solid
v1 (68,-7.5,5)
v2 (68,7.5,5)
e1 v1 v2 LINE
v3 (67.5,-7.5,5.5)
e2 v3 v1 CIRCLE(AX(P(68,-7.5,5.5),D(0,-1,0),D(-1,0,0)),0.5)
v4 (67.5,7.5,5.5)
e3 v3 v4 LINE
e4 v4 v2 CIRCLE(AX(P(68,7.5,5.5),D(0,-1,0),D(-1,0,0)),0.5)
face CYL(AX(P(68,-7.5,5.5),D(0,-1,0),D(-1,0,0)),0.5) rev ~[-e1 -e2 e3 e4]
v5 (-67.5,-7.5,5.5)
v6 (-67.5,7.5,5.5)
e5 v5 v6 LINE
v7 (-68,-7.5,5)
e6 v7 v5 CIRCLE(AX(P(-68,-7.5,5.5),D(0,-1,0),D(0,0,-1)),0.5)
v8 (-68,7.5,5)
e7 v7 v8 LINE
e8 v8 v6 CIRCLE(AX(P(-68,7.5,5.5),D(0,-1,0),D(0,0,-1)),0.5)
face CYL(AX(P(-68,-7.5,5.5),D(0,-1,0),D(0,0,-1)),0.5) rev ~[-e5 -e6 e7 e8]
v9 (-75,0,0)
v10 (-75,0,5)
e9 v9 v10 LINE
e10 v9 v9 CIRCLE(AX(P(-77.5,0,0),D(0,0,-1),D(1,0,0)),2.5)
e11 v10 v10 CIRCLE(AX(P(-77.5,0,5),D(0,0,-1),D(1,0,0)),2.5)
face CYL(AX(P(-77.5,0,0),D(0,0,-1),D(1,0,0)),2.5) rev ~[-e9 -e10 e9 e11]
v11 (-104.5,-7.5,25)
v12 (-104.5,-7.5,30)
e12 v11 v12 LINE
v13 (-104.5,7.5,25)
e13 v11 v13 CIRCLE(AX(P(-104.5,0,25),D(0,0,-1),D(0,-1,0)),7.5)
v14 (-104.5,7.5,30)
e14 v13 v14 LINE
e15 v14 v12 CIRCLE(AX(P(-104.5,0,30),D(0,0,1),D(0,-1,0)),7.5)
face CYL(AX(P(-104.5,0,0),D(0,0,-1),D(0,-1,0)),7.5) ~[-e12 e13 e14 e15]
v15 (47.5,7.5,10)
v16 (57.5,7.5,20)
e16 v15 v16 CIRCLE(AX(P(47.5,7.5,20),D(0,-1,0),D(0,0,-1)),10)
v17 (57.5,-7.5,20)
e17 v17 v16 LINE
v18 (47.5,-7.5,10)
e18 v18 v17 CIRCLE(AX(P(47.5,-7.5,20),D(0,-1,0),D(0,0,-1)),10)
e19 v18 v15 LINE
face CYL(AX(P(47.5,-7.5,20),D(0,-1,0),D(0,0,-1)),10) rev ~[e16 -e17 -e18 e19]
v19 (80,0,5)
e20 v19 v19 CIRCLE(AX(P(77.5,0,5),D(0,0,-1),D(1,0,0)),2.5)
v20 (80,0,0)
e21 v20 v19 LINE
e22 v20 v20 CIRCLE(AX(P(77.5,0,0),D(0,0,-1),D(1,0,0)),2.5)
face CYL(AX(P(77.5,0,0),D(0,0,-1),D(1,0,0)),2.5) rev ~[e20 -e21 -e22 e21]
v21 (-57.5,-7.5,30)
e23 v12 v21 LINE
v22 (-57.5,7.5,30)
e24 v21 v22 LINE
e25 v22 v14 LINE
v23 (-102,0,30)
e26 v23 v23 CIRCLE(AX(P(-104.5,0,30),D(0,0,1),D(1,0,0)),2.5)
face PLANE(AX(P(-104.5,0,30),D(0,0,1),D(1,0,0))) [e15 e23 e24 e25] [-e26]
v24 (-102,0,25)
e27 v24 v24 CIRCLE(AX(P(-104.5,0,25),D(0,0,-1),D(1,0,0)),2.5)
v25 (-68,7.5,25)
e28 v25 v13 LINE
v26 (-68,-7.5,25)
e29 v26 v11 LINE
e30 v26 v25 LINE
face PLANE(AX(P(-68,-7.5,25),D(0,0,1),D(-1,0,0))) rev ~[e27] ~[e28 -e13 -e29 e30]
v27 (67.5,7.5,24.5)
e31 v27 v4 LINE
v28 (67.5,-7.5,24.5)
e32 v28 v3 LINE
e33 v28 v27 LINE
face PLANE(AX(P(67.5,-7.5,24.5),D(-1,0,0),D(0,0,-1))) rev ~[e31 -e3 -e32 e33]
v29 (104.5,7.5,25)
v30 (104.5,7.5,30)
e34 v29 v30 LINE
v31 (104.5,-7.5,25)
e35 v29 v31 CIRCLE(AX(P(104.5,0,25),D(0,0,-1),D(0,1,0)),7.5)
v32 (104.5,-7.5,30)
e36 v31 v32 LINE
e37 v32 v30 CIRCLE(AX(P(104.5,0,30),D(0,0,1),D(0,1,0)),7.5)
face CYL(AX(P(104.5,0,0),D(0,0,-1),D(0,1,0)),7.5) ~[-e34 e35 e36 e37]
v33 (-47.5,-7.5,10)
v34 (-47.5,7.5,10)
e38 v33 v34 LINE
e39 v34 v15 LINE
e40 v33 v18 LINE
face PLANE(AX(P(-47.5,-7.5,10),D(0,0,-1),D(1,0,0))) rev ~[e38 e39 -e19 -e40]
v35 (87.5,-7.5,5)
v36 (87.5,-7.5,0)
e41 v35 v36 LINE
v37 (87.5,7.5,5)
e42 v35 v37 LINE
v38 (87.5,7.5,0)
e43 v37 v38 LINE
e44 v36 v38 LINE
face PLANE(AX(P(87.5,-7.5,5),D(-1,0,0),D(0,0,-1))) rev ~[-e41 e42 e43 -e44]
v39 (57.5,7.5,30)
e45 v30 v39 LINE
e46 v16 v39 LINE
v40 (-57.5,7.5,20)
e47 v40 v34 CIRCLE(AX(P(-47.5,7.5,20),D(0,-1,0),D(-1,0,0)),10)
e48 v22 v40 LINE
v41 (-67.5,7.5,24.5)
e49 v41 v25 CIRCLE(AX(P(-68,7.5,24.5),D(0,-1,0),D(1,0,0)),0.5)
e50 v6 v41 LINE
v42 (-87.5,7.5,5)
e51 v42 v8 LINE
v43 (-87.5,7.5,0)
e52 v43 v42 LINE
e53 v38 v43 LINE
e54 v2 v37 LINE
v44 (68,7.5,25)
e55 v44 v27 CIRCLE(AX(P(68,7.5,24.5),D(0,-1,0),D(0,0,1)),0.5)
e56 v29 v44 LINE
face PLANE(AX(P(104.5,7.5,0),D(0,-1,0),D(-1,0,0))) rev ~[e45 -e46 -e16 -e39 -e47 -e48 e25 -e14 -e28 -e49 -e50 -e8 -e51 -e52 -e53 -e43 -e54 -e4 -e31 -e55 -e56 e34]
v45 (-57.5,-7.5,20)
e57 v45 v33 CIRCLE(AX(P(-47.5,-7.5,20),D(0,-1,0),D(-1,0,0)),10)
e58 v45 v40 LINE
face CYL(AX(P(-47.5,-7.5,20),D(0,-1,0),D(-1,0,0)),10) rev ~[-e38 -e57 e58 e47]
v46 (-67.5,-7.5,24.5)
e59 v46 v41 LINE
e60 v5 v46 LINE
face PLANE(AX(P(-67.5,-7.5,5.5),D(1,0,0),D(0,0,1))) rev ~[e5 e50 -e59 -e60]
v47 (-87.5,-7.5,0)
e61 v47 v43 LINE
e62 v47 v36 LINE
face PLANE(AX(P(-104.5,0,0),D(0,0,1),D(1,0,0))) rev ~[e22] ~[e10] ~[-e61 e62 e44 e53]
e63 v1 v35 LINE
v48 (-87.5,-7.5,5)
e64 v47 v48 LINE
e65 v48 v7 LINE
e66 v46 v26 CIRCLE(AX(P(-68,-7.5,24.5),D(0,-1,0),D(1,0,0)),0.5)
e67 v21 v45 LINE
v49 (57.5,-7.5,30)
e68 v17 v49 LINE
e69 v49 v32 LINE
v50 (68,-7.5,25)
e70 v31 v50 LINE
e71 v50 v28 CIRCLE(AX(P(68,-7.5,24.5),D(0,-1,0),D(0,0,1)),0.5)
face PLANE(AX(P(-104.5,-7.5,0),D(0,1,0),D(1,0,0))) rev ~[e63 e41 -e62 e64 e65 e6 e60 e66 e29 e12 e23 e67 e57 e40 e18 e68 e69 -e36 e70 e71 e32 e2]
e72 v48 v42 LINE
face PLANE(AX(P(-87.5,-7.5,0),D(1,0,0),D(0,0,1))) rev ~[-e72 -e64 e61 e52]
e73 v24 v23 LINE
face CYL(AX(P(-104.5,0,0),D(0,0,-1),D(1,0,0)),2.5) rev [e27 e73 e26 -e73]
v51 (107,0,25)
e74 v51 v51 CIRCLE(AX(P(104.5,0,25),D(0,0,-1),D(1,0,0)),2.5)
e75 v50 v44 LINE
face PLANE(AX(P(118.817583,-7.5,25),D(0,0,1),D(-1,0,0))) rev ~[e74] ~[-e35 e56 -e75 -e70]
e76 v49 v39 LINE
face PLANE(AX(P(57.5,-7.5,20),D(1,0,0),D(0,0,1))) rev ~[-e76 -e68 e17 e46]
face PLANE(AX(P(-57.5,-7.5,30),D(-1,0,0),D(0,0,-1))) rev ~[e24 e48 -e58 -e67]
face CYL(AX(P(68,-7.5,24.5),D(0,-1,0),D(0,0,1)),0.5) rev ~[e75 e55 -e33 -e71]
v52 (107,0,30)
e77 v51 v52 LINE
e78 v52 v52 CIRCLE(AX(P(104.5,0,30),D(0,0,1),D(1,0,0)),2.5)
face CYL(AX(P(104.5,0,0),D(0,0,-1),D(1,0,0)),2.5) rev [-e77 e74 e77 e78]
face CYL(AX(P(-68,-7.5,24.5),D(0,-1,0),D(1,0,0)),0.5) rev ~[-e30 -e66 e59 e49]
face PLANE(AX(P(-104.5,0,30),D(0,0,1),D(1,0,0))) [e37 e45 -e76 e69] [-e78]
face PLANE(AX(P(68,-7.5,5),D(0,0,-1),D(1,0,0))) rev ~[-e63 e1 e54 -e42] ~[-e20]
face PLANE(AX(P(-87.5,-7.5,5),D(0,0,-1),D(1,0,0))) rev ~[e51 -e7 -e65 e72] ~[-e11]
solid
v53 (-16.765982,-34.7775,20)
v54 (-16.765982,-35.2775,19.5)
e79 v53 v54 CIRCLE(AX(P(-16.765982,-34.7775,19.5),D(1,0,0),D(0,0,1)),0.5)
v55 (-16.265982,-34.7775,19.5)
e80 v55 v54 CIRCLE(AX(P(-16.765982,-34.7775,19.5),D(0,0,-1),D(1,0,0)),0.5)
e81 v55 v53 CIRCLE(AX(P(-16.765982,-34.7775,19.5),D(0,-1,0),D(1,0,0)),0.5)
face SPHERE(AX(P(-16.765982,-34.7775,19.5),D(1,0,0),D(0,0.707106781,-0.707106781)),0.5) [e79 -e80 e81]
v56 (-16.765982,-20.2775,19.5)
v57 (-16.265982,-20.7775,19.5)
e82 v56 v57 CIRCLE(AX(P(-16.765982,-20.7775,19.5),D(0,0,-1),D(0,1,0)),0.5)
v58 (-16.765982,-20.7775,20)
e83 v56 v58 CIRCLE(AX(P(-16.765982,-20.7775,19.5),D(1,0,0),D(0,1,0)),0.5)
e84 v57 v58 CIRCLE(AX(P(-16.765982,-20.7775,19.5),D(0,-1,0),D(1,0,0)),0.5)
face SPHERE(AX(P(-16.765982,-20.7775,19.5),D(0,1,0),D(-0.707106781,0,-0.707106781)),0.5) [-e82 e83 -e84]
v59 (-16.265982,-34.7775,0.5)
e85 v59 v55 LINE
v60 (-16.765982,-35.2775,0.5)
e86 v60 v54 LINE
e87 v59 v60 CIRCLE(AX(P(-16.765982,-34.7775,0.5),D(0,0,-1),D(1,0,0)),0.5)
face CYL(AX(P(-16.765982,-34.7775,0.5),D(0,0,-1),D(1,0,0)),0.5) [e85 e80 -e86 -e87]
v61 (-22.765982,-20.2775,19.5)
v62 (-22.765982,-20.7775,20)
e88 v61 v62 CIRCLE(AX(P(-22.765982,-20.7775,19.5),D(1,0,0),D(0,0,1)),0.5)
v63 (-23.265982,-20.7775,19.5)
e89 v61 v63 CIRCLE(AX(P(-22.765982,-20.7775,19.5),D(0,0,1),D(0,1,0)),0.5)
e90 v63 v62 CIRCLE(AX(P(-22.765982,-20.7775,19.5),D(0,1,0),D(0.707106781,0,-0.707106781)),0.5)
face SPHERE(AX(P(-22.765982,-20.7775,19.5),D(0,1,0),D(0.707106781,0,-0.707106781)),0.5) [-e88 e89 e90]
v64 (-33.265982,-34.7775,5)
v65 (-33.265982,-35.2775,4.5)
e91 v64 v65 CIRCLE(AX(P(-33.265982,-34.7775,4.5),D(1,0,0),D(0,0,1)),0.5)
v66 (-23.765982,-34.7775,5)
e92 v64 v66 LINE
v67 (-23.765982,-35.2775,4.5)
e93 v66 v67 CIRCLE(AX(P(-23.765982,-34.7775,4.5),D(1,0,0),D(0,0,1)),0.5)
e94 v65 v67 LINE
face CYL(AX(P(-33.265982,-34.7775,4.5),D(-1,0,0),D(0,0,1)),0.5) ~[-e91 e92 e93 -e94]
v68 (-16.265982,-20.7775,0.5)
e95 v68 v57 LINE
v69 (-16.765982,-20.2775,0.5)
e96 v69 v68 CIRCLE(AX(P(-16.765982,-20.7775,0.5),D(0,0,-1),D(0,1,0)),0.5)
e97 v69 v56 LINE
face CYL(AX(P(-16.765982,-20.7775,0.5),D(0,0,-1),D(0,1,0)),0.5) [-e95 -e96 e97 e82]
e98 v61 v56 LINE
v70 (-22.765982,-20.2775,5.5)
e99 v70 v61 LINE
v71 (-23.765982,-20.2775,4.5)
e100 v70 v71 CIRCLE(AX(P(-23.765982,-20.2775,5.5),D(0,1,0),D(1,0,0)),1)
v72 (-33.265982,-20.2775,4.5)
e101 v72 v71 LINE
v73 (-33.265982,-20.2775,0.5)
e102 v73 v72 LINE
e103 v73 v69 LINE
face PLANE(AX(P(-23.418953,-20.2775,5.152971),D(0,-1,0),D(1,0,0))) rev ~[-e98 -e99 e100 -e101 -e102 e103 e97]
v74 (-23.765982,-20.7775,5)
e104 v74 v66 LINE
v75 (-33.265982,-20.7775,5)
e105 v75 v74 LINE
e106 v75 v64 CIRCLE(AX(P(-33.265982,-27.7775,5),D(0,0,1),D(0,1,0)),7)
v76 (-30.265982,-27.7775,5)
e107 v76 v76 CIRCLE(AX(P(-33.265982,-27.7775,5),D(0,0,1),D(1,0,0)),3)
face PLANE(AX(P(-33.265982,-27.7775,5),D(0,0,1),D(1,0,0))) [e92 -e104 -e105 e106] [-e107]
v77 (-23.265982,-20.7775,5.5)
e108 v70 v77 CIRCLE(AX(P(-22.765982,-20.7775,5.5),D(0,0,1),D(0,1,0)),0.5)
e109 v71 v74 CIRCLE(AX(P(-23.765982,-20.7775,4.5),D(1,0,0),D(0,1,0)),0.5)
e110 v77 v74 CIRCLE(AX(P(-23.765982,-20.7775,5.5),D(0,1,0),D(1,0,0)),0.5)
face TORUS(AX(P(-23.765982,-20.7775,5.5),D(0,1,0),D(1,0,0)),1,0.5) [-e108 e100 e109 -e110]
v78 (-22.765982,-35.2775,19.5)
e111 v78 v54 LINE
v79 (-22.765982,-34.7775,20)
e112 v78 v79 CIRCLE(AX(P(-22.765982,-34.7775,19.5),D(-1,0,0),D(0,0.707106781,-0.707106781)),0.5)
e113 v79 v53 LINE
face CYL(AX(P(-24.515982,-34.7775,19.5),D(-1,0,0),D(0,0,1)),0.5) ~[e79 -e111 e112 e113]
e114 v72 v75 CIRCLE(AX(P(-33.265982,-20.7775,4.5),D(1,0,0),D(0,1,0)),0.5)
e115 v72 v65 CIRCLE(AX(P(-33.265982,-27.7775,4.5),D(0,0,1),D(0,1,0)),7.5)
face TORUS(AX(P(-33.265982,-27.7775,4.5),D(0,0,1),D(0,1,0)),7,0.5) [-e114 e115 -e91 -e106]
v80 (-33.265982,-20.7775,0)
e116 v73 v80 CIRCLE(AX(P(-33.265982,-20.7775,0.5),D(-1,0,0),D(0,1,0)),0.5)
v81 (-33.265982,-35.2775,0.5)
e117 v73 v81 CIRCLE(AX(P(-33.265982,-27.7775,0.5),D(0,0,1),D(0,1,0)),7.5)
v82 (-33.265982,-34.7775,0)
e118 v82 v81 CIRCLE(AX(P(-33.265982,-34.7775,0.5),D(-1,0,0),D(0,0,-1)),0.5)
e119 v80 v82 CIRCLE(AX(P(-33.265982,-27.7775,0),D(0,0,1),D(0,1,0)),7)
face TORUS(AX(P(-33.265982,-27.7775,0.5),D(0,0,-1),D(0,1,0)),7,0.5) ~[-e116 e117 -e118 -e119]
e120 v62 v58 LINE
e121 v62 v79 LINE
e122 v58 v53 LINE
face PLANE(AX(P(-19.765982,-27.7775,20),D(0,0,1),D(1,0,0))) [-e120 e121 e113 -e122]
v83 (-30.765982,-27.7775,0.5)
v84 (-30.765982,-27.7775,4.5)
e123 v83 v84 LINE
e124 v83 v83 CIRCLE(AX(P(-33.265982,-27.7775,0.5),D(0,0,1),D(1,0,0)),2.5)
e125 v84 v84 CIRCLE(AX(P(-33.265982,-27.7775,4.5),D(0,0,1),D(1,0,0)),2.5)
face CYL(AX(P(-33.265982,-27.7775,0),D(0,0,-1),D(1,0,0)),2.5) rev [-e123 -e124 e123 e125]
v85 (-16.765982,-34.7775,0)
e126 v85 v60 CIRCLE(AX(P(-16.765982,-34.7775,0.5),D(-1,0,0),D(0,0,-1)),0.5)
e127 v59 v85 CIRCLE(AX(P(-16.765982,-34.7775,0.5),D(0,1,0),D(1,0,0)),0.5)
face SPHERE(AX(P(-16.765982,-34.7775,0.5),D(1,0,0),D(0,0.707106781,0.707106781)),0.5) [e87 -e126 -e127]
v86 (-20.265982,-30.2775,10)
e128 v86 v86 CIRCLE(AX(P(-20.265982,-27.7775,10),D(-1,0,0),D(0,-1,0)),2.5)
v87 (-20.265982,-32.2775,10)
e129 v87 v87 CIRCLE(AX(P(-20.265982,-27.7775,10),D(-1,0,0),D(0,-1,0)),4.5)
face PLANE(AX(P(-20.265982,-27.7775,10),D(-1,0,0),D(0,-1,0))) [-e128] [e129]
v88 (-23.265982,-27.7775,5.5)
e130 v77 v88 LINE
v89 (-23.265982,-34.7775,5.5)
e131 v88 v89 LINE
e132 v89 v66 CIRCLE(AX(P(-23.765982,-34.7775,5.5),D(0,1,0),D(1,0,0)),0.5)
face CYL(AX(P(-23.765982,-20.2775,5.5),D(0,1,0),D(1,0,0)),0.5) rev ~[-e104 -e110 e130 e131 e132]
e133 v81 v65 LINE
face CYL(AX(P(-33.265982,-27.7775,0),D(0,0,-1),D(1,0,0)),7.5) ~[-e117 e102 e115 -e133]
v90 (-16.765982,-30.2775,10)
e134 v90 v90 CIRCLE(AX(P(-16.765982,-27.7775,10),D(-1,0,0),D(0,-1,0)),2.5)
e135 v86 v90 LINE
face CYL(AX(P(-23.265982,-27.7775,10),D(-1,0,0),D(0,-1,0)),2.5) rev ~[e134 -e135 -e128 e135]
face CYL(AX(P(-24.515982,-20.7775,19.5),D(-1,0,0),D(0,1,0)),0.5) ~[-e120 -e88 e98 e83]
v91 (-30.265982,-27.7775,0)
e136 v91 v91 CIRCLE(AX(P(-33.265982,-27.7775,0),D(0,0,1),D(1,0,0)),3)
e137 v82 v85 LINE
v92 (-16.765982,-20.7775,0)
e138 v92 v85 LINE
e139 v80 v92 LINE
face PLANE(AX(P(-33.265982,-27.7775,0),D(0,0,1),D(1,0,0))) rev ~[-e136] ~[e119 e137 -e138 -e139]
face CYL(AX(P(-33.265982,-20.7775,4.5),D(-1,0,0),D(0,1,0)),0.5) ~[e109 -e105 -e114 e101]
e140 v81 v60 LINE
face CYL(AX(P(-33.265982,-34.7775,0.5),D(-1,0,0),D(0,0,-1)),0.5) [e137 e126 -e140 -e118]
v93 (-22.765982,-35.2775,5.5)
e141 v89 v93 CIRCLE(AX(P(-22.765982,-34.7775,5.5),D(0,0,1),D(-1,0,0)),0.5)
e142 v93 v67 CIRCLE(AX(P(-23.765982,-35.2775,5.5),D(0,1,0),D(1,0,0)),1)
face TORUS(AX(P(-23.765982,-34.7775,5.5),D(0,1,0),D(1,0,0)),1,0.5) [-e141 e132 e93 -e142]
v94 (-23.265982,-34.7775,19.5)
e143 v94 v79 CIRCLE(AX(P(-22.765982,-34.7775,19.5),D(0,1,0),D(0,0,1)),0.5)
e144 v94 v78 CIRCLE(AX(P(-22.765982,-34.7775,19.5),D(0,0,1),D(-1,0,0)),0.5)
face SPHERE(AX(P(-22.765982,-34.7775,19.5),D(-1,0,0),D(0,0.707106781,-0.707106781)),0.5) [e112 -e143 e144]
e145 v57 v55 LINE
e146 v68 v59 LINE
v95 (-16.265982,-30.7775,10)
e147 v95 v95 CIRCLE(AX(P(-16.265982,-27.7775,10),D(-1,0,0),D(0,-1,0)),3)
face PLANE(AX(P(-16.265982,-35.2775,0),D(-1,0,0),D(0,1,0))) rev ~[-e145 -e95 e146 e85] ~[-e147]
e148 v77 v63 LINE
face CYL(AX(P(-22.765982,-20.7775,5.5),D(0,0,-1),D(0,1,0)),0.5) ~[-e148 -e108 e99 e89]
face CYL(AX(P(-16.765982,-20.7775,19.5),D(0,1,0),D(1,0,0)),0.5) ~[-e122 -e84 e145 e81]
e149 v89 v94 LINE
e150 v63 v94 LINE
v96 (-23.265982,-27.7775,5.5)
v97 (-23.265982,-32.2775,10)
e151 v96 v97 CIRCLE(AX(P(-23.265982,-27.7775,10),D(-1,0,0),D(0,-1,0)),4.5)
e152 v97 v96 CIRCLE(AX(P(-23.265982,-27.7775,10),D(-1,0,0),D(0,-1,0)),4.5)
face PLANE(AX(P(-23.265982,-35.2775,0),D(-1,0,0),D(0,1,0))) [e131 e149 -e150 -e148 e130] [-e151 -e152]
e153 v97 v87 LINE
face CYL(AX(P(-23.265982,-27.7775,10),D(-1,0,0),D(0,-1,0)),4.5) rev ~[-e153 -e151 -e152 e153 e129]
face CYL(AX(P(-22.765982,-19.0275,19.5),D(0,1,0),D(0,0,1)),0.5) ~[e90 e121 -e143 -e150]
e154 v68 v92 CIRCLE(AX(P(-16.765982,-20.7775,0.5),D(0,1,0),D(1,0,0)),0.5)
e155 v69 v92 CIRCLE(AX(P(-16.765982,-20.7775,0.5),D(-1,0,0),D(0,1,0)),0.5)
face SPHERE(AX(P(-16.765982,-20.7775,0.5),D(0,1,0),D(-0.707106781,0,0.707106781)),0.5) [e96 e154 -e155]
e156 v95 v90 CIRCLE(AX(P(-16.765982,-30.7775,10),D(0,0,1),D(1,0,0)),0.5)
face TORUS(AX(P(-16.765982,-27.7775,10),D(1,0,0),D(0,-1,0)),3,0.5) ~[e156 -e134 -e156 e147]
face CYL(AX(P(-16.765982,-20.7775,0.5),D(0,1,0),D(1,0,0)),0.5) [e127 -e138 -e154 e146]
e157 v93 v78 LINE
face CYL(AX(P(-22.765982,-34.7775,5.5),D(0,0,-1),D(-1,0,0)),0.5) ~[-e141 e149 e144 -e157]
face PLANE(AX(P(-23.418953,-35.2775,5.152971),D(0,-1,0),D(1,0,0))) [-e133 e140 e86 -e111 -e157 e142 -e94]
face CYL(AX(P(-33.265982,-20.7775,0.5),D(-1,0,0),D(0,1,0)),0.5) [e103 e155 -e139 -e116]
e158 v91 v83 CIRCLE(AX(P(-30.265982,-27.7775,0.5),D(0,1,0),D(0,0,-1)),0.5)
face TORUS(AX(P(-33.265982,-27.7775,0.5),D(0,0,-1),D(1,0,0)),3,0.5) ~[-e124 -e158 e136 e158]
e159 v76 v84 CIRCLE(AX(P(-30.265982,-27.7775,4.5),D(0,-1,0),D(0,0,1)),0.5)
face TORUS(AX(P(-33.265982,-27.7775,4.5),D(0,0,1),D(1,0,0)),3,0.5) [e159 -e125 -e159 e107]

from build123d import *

# Parameters (mm, degrees)
F0_R          = 2.5
F1_DEPTH      = 30
F3_DEPTH      = 25
F4_R          = 2.5
F5_DEPTH      = 25
F6_W          = 7
F6_H          = 15
F7_DEPTH      = 20
F6_R          = 2.5
F8_DEPTH      = 5
F9_R          = 4.5
F9_R_2        = 2.5
F10_DEPTH     = 3
F11_DEPTH     = 7
F12_T1_DEPTH  = 15
F12_T3_DEPTH  = 7.75
F12_T5_DEPTH  = 17.5
F12_T7_DEPTH  = 14
F12_T9_DEPTH  = 19
F12_T11_DEPTH = 16.5
F12_S15_W     = 0.5
F12_S15_H     = 0.5
F12_T16_DEPTH = 0.5
F12_S21_W     = 0.5
F12_S21_H     = 0.5
F12_T22_DEPTH = 0.5
F12_S27_W     = 0.5
F12_S27_H     = 0.5
F12_T28_DEPTH = 0.5
F12_S33_W     = 0.5
F12_S33_H     = 0.5
F12_T34_DEPTH = 0.5
F12_T40_ANGLE = 180
F12_T45_DEPTH = 14
F12_T47_DEPTH = 9.5
F12_S51_W     = 0.5
F12_S51_H     = 0.5
F12_T52_DEPTH = 0.5
F12_S57_W     = 0.5
F12_S57_H     = 0.5
F12_T58_DEPTH = 0.5
F12_T62_ANGLE = 180
F12_T64_ANGLE = 90
F12_T66_ANGLE = 90


# Not quite as in the source:
# - a fillet or chamfer that OpenCascade refuses, or shapes differently, is made with other operations: its cross-section is extruded or revolved along the edge and cut away or added


with BuildPart() as f1:
    # F0 (on Top) → F1 (new body)
    with BuildSketch(Plane.XY):
        with BuildLine():
            ThreePointArc((-97, 0), (-99.1966991411, 5.3033008589), (-104.5, 7.5))
            ThreePointArc((-104.5, 7.5), (-112, 0), (-104.5, -7.5))
            ThreePointArc((-104.5, -7.5), (-99.1966991411, -5.3033008589), (-97, 0))
        make_face()
        with Locations((-104.5, 0)):
            Circle(F0_R, mode=Mode.SUBTRACT)
        with BuildLine():
            ThreePointArc((104.5, -7.5), (97, 0), (104.5, 7.5))
            Line((104.5, 7.5), (-104.5, 7.5))
            ThreePointArc((-104.5, 7.5), (-99.1966991411, 5.3033008589), (-97, 0))
            ThreePointArc((-97, 0), (-99.1966991411, -5.3033008589), (-104.5, -7.5))
            Line((-104.5, -7.5), (104.5, -7.5))
        make_face()
        with BuildLine():
            ThreePointArc((104.5, -7.5), (109.8033008589, -5.3033008589), (112, 0))
            ThreePointArc((112, 0), (109.8033008589, 5.3033008589), (104.5, 7.5))
            ThreePointArc((104.5, 7.5), (97, 0), (104.5, -7.5))
        make_face()
        with Locations((104.5, 0)):
            Circle(F0_R, mode=Mode.SUBTRACT)
    extrude(amount=F1_DEPTH)

    # F2 (on face) → F3 (cut)
    with BuildSketch(Plane.XZ.offset(7.5)):
        with BuildLine():
            Line((57.5, 30), (0, 30))
            Line((0, 30), (0, 10))
            Line((0, 10), (47.5, 10))
            ThreePointArc((47.5, 10), (54.5710678119, 12.9289321881), (57.5, 20))
            Line((57.5, 20), (57.5, 30))
        make_face()
        with BuildLine():
            Line((0, 10), (0, 30))
            Line((0, 30), (-57.5, 30))
            Line((-57.5, 30), (-57.5, 20))
            ThreePointArc((-57.5, 20), (-54.5710678119, 12.9289321881), (-47.5, 10))
            Line((-47.5, 10), (0, 10))
        make_face()
        with BuildLine():
            Line((104.5, 0), (104.5, 25))
            Line((104.5, 25), (68, 25))
            ThreePointArc((68, 25), (67.6464466094, 24.8535533906), (67.5, 24.5))
            Line((67.5, 24.5), (67.5, 5.5))
            ThreePointArc((67.5, 5.5), (67.6464466094, 5.1464466094), (68, 5))
            Line((68, 5), (87.5, 5))
            Line((87.5, 5), (87.5, 0))
            Line((87.5, 0), (104.5, 0))
        make_face()
        Polygon((118.8175827265, 25), (104.5, 25), (104.5, 0), (118.8175827265, 0), (118.8175827265, 5), align=None)
        with BuildLine():
            Line((-68, 25), (-104.5, 25))
            Line((-104.5, 25), (-104.5, 0))
            Line((-104.5, 0), (-87.5, 0))
            Line((-87.5, 0), (-87.5, 5))
            Line((-87.5, 5), (-68, 5))
            ThreePointArc((-68, 5), (-67.6464466094, 5.1464466094), (-67.5, 5.5))
            Line((-67.5, 5.5), (-67.5, 24.5))
            ThreePointArc((-67.5, 24.5), (-67.6464466094, 24.8535533906), (-68, 25))
        make_face()
        Polygon((-104.5, 0), (-104.5, 25), (-118.8175827265, 25), (-118.8175827265, 5), (-118.8175827265, 0), align=None)
    extrude(amount=-F3_DEPTH, mode=Mode.SUBTRACT)

    # F4 (on face) → F5 (cut)
    with BuildSketch(Plane(origin=(0, 0, 0), x_dir=(1, 0, 0), z_dir=(0, 0, -1))):
        with Locations((-77.5, 0)):
            Circle(F4_R)
        with Locations((77.5, 0)):
            Circle(F4_R)
    extrude(amount=-F5_DEPTH, mode=Mode.SUBTRACT)


with BuildPart() as f7:
    # F6 (on Top) → F7 (new body)
    with BuildSketch(Plane.XY):
        with Locations((-19.7659818232, -27.7775004506)):
            Rectangle(F6_W, F6_H)
    extrude(amount=F7_DEPTH)

    # F6 (on Top) → F8 (join)
    with BuildSketch(Plane.XY):
        with BuildLine():
            ThreePointArc((-33.2659818232, -35.2775004506), (-27.9626809643, -33.0808013095), (-25.7659818232, -27.7775004506))
            ThreePointArc((-25.7659818232, -27.7775004506), (-27.9626809643, -22.4741995917), (-33.2659818232, -20.2775004506))
            ThreePointArc((-33.2659818232, -20.2775004506), (-40.7659818232, -27.7775004506), (-33.2659818232, -35.2775004506))
        make_face()
        with Locations((-33.2659818232, -27.7775004506)):
            Circle(F6_R, mode=Mode.SUBTRACT)
        with BuildLine():
            Line((-25.7659818232, -35.2775004506), (-25.7659818232, -27.7775004506))
            ThreePointArc((-25.7659818232, -27.7775004506), (-27.9626809643, -33.0808013095), (-33.2659818232, -35.2775004506))
            Line((-33.2659818232, -35.2775004506), (-25.7659818232, -35.2775004506))
        make_face()
        with BuildLine():
            ThreePointArc((-33.2659818232, -20.2775004506), (-27.9626809643, -22.4741995917), (-25.7659818232, -27.7775004506))
            Line((-25.7659818232, -27.7775004506), (-25.7659818232, -20.2775004506))
            Line((-25.7659818232, -20.2775004506), (-33.2659818232, -20.2775004506))
        make_face()
        Polygon((-25.7659818232, -20.2775004506), (-25.7659818232, -27.7775004506), (-25.7659818232, -35.2775004506), (-23.2659818232, -35.2775004506), (-23.2659818232, -20.2775004506), align=None)
    extrude(amount=F8_DEPTH)

    # F9 (on face) → F10 (cut)
    with BuildSketch(Plane(origin=(-23.2659818232, 0, 0), x_dir=(0, -1, 0), z_dir=(-1, 0, 0))):
        with Locations((27.7775004506, 10)):
            Circle(F9_R)
        with Locations((27.7775004506, 10)):
            Circle(F9_R_2, mode=Mode.SUBTRACT)
    extrude(amount=-F10_DEPTH, mode=Mode.SUBTRACT)

    # F11 (cut, through all): a face of the model
    f11_faces = [f7.faces().sort_by_distance(p)[0] for p in [
        (-23.2659818232, -27.7775004506, 10),
    ]]
    extrude(f11_faces, amount=-F11_DEPTH, mode=Mode.SUBTRACT)

    # F12: fillet of radius 0.5 on 20 edges, made by hand

    # F12_s2 → F12_t1 (join)
    with BuildSketch(Plane.XZ.offset(20.2775004506)):
        with BuildLine():
            ThreePointArc((-23.2659818232, 5.5), (-23.4124284326, 5.1464466094), (-23.7659818232, 5))
            Line((-23.7659818232, 5), (-23.2659818232, 5))
            Line((-23.2659818232, 5), (-23.2659818232, 5.5))
        make_face()
    extrude(amount=F12_T1_DEPTH)

    # F12_s4 → F12_t3 (cut)
    with BuildSketch(Plane.YZ.offset(-24.5159818232)):
        with BuildLine():
            ThreePointArc((-20.2775004506, 19.5), (-20.42394706, 19.8535533906), (-20.7775004506, 20))
            Line((-20.7775004506, 20), (-20.2775004506, 20))
            Line((-20.2775004506, 20), (-20.2775004506, 19.5))
        make_face()
        with BuildLine():
            ThreePointArc((-34.7775004506, 20), (-35.1310538412, 19.8535533906), (-35.2775004506, 19.5))
            Line((-35.2775004506, 19.5), (-35.2775004506, 20))
            Line((-35.2775004506, 20), (-34.7775004506, 20))
        make_face()
    extrude(amount=F12_T3_DEPTH, mode=Mode.SUBTRACT)

    # F12_s6 → F12_t5 (cut)
    with BuildSketch(Plane.XZ.offset(19.0275004506)):
        with BuildLine():
            ThreePointArc((-22.7659818232, 20), (-23.1195352138, 19.8535533906), (-23.2659818232, 19.5))
            Line((-23.2659818232, 19.5), (-23.2659818232, 20))
            Line((-23.2659818232, 20), (-22.7659818232, 20))
        make_face()
    extrude(amount=F12_T5_DEPTH, mode=Mode.SUBTRACT)

    # F12_s8 → F12_t7 (cut)
    with BuildSketch(Plane.XZ.offset(20.7775004506)):
        with BuildLine():
            ThreePointArc((-16.2659818232, 19.5), (-16.4124284326, 19.8535533906), (-16.7659818232, 20))
            Line((-16.7659818232, 20), (-16.2659818232, 20))
            Line((-16.2659818232, 20), (-16.2659818232, 19.5))
        make_face()
        with BuildLine():
            ThreePointArc((-16.2659818232, 0.5), (-16.4124284326, 0.1464466094), (-16.7659818232, 0))
            Line((-16.7659818232, 0), (-16.2659818232, 0))
            Line((-16.2659818232, 0), (-16.2659818232, 0.5))
        make_face()
    extrude(amount=F12_T7_DEPTH, mode=Mode.SUBTRACT)

    # F12_s10 → F12_t9 (cut)
    with BuildSketch(Plane.XY.offset(0.5)):
        with BuildLine():
            ThreePointArc((-16.2659818232, -34.7775004506), (-16.4124284326, -35.1310538412), (-16.7659818232, -35.2775004506))
            Line((-16.7659818232, -35.2775004506), (-16.2659818232, -35.2775004506))
            Line((-16.2659818232, -35.2775004506), (-16.2659818232, -34.7775004506))
        make_face()
        with BuildLine():
            ThreePointArc((-16.7659818232, -20.2775004506), (-16.4124284326, -20.42394706), (-16.2659818232, -20.7775004506))
            Line((-16.2659818232, -20.7775004506), (-16.2659818232, -20.2775004506))
            Line((-16.2659818232, -20.2775004506), (-16.7659818232, -20.2775004506))
        make_face()
    extrude(amount=F12_T9_DEPTH, mode=Mode.SUBTRACT)

    # F12_s12 → F12_t11 (cut)
    with BuildSketch(Plane.YZ.offset(-33.2659818232)):
        with BuildLine():
            ThreePointArc((-34.7775004506, 0), (-35.1310538412, 0.1464466094), (-35.2775004506, 0.5))
            Line((-35.2775004506, 0.5), (-35.2775004506, 0))
            Line((-35.2775004506, 0), (-34.7775004506, 0))
        make_face()
        with BuildLine():
            ThreePointArc((-20.2775004506, 0.5), (-20.42394706, 0.1464466094), (-20.7775004506, 0))
            Line((-20.7775004506, 0), (-20.2775004506, 0))
            Line((-20.2775004506, 0), (-20.2775004506, 0.5))
        make_face()
    extrude(amount=F12_T11_DEPTH, mode=Mode.SUBTRACT)


with BuildPart() as f12_tool14:
    # F12_s15 → F12_t16 (new body)
    with BuildSketch(Plane.XZ.offset(20.7775004506)):
        with Locations((-16.5159818232, 19.75)):
            Rectangle(F12_S15_W, F12_S15_H)
    extrude(amount=-F12_T16_DEPTH)

    # F12_s17 → F12_t18 (revolve, cut)
    with BuildSketch(Plane(origin=(-16.7659818232, -20.7775004506, 19.5), x_dir=(-0.7071067812, 0, -0.7071067812), z_dir=(0.7071067812, 0, -0.7071067812))):
        with BuildLine():
            ThreePointArc((0, -0.5), (0.5, 0), (0, 0.5))
            Line((0, 0.5), (0, -0.5))
        make_face()
    revolve(axis=Axis((-16.7659818232, -20.7775004506, 19.5), (0, 1, 0)), mode=Mode.SUBTRACT)


with BuildPart() as f7_1:
    add(f7.part)

    # F12_t13: cut F12_tool14
    add(f12_tool14.part, mode=Mode.SUBTRACT)


with BuildPart() as f12_tool20:
    # F12_s21 → F12_t22 (new body)
    with BuildSketch(Plane.YZ.offset(-16.7659818232)):
        with Locations((-35.0275004506, 19.75)):
            Rectangle(F12_S21_W, F12_S21_H)
    extrude(amount=F12_T22_DEPTH)

    # F12_s23 → F12_t24 (revolve, cut)
    with BuildSketch(Plane(origin=(-16.7659818232, -34.7775004506, 19.5), x_dir=(0, 0.7071067812, -0.7071067812), z_dir=(0, -0.7071067812, -0.7071067812))):
        with BuildLine():
            ThreePointArc((0, -0.5), (0.5, 0), (0, 0.5))
            Line((0, 0.5), (0, -0.5))
        make_face()
    revolve(axis=Axis((-16.7659818232, -34.7775004506, 19.5), (1, 0, 0)), mode=Mode.SUBTRACT)


with BuildPart() as f7_2:
    add(f7_1.part)

    # F12_t19: cut F12_tool20
    add(f12_tool20.part, mode=Mode.SUBTRACT)


with BuildPart() as f12_tool26:
    # F12_s27 → F12_t28 (new body)
    with BuildSketch(Plane.YZ.offset(-16.7659818232)):
        with Locations((-35.0275004506, 0.25)):
            Rectangle(F12_S27_W, F12_S27_H)
    extrude(amount=F12_T28_DEPTH)

    # F12_s29 → F12_t30 (revolve, cut)
    with BuildSketch(Plane(origin=(-16.7659818232, -34.7775004506, 0.5), x_dir=(0, 0.7071067812, 0.7071067812), z_dir=(0, 0.7071067812, -0.7071067812))):
        with BuildLine():
            ThreePointArc((0, -0.5), (0.5, 0), (0, 0.5))
            Line((0, 0.5), (0, -0.5))
        make_face()
    revolve(axis=Axis((-16.7659818232, -34.7775004506, 0.5), (1, 0, 0)), mode=Mode.SUBTRACT)


with BuildPart() as f7_3:
    add(f7_2.part)

    # F12_t25: cut F12_tool26
    add(f12_tool26.part, mode=Mode.SUBTRACT)


with BuildPart() as f12_tool32:
    # F12_s33 → F12_t34 (new body)
    with BuildSketch(Plane.XZ.offset(20.7775004506)):
        with Locations((-16.5159818232, 0.25)):
            Rectangle(F12_S33_W, F12_S33_H)
    extrude(amount=-F12_T34_DEPTH)

    # F12_s35 → F12_t36 (revolve, cut)
    with BuildSketch(Plane(origin=(-16.7659818232, -20.7775004506, 0.5), x_dir=(-0.7071067812, 0, 0.7071067812), z_dir=(-0.7071067812, 0, -0.7071067812))):
        with BuildLine():
            ThreePointArc((0, -0.5), (0.5, 0), (0, 0.5))
            Line((0, 0.5), (0, -0.5))
        make_face()
    revolve(axis=Axis((-16.7659818232, -20.7775004506, 0.5), (0, 1, 0)), mode=Mode.SUBTRACT)


with BuildPart() as f7_4:
    add(f7_3.part)

    # F12_t31: cut F12_tool32
    add(f12_tool32.part, mode=Mode.SUBTRACT)

    # F12_s37 → F12_t38 (revolve, cut)
    with BuildSketch(Plane.XZ.offset(27.7775004506)):
        with BuildLine():
            ThreePointArc((-30.2659818232, 5), (-30.6195352138, 4.8535533906), (-30.7659818232, 4.5))
            Line((-30.7659818232, 4.5), (-30.7659818232, 5))
            Line((-30.7659818232, 5), (-30.2659818232, 5))
        make_face()
    revolve(axis=Axis((-33.2659818232, -27.7775004506, 5), (0, 0, 1)), mode=Mode.SUBTRACT)

    # F12_s39 → F12_t40 (revolve, cut)
    with BuildSketch(Plane.YZ.offset(-33.2659818232)):
        with BuildLine():
            ThreePointArc((-20.2775004506, 0.5), (-20.42394706, 0.1464466094), (-20.7775004506, 0))
            Line((-20.7775004506, 0), (-20.2775004506, 0))
            Line((-20.2775004506, 0), (-20.2775004506, 0.5))
        make_face()
    revolve(axis=Axis((-33.2659818232, -27.7775004506, 0), (0, 0, 1)), revolution_arc=F12_T40_ANGLE, mode=Mode.SUBTRACT)

    # F12_s41 → F12_t42 (revolve, cut)
    with BuildSketch(Plane.XZ.offset(27.7775004506)):
        with BuildLine():
            ThreePointArc((-30.2659818232, 0), (-30.6195352138, 0.1464466094), (-30.7659818232, 0.5))
            Line((-30.7659818232, 0.5), (-30.7659818232, 0))
            Line((-30.7659818232, 0), (-30.2659818232, 0))
        make_face()
    revolve(axis=Axis((-33.2659818232, -27.7775004506, 0), (0, 0, 1)), mode=Mode.SUBTRACT)

    # F12_s43 → F12_t44 (revolve, cut)
    with BuildSketch(Plane.XY.offset(10)):
        with BuildLine():
            ThreePointArc((-16.2659818232, -30.7775004506), (-16.4124284326, -30.42394706), (-16.7659818232, -30.2775004506))
            Line((-16.7659818232, -30.2775004506), (-16.2659818232, -30.2775004506))
            Line((-16.2659818232, -30.2775004506), (-16.2659818232, -30.7775004506))
        make_face()
    revolve(axis=Axis((-16.2659818232, -27.7775004506, 10), (-1, 0, 0)), mode=Mode.SUBTRACT)

    # F12_s46 → F12_t45 (cut)
    with BuildSketch(Plane.XY.offset(5.5)):
        with BuildLine():
            ThreePointArc((-23.2659818232, -34.7775004506), (-23.1195352138, -35.1310538412), (-22.7659818232, -35.2775004506))
            Line((-22.7659818232, -35.2775004506), (-23.2659818232, -35.2775004506))
            Line((-23.2659818232, -35.2775004506), (-23.2659818232, -34.7775004506))
        make_face()
        with BuildLine():
            ThreePointArc((-22.7659818232, -20.2775004506), (-23.1195352138, -20.42394706), (-23.2659818232, -20.7775004506))
            Line((-23.2659818232, -20.7775004506), (-23.2659818232, -20.2775004506))
            Line((-23.2659818232, -20.2775004506), (-22.7659818232, -20.2775004506))
        make_face()
    extrude(amount=F12_T45_DEPTH, mode=Mode.SUBTRACT)

    # F12_s48 → F12_t47 (cut)
    with BuildSketch(Plane.YZ.offset(-33.2659818232)):
        with BuildLine():
            ThreePointArc((-34.7775004506, 5), (-35.1310538412, 4.8535533906), (-35.2775004506, 4.5))
            Line((-35.2775004506, 4.5), (-35.2775004506, 5))
            Line((-35.2775004506, 5), (-34.7775004506, 5))
        make_face()
        with BuildLine():
            ThreePointArc((-20.2775004506, 4.5), (-20.42394706, 4.8535533906), (-20.7775004506, 5))
            Line((-20.7775004506, 5), (-20.2775004506, 5))
            Line((-20.2775004506, 5), (-20.2775004506, 4.5))
        make_face()
    extrude(amount=F12_T47_DEPTH, mode=Mode.SUBTRACT)


with BuildPart() as f12_tool50:
    # F12_s51 → F12_t52 (new body)
    with BuildSketch(Plane.XZ.offset(20.7775004506)):
        with Locations((-23.0159818232, 19.75)):
            Rectangle(F12_S51_W, F12_S51_H)
    extrude(amount=-F12_T52_DEPTH)

    # F12_s53 → F12_t54 (revolve, cut)
    with BuildSketch(Plane(origin=(-22.7659818232, -20.7775004506, 19.5), x_dir=(0.7071067812, 0, -0.7071067812), z_dir=(0.7071067812, 0, 0.7071067812))):
        with BuildLine():
            ThreePointArc((0, -0.5), (0.5, 0), (0, 0.5))
            Line((0, 0.5), (0, -0.5))
        make_face()
    revolve(axis=Axis((-22.7659818232, -20.7775004506, 19.5), (0, 1, 0)), mode=Mode.SUBTRACT)


with BuildPart() as f7_5:
    add(f7_4.part)

    # F12_t49: cut F12_tool50
    add(f12_tool50.part, mode=Mode.SUBTRACT)


with BuildPart() as f12_tool56:
    # F12_s57 → F12_t58 (new body)
    with BuildSketch(Plane.YZ.offset(-22.7659818232)):
        with Locations((-35.0275004506, 19.75)):
            Rectangle(F12_S57_W, F12_S57_H)
    extrude(amount=-F12_T58_DEPTH)

    # F12_s59 → F12_t60 (revolve, cut)
    with BuildSketch(Plane(origin=(-22.7659818232, -34.7775004506, 19.5), x_dir=(0, 0.7071067812, -0.7071067812), z_dir=(0, 0.7071067812, 0.7071067812))):
        with BuildLine():
            ThreePointArc((0, -0.5), (0.5, 0), (0, 0.5))
            Line((0, 0.5), (0, -0.5))
        make_face()
    revolve(axis=Axis((-22.7659818232, -34.7775004506, 19.5), (-1, 0, 0)), mode=Mode.SUBTRACT)


with BuildPart() as f7_6:
    add(f7_5.part)

    # F12_t55: cut F12_tool56
    add(f12_tool56.part, mode=Mode.SUBTRACT)

    # F12_s61 → F12_t62 (revolve, cut)
    with BuildSketch(Plane.YZ.offset(-33.2659818232)):
        with BuildLine():
            ThreePointArc((-20.2775004506, 4.5), (-20.42394706, 4.8535533906), (-20.7775004506, 5))
            Line((-20.7775004506, 5), (-20.2775004506, 5))
            Line((-20.2775004506, 5), (-20.2775004506, 4.5))
        make_face()
    revolve(axis=Axis((-33.2659818232, -27.7775004506, 5), (0, 0, 1)), revolution_arc=F12_T62_ANGLE, mode=Mode.SUBTRACT)

    # F12_s63 → F12_t64 (revolve, cut)
    with BuildSketch(Plane.XY.offset(5.5)):
        with BuildLine():
            ThreePointArc((-22.7659818232, -20.2775004506), (-23.1195352138, -20.42394706), (-23.2659818232, -20.7775004506))
            Line((-23.2659818232, -20.7775004506), (-23.2659818232, -20.2775004506))
            Line((-23.2659818232, -20.2775004506), (-22.7659818232, -20.2775004506))
        make_face()
    revolve(axis=Axis((-23.7659818232, -20.2775004506, 5.5), (0, 1, 0)), revolution_arc=F12_T64_ANGLE, mode=Mode.SUBTRACT)

    # F12_s65 → F12_t66 (revolve, cut)
    with BuildSketch(Plane.XY.offset(5.5)):
        with BuildLine():
            ThreePointArc((-23.2659818232, -34.7775004506), (-23.1195352138, -35.1310538412), (-22.7659818232, -35.2775004506))
            Line((-22.7659818232, -35.2775004506), (-23.2659818232, -35.2775004506))
            Line((-23.2659818232, -35.2775004506), (-23.2659818232, -34.7775004506))
        make_face()
    revolve(axis=Axis((-23.7659818232, -35.2775004506, 5.5), (0, 1, 0)), revolution_arc=F12_T66_ANGLE, mode=Mode.SUBTRACT)


solid = Compound([f1.part, f7_6.part])
